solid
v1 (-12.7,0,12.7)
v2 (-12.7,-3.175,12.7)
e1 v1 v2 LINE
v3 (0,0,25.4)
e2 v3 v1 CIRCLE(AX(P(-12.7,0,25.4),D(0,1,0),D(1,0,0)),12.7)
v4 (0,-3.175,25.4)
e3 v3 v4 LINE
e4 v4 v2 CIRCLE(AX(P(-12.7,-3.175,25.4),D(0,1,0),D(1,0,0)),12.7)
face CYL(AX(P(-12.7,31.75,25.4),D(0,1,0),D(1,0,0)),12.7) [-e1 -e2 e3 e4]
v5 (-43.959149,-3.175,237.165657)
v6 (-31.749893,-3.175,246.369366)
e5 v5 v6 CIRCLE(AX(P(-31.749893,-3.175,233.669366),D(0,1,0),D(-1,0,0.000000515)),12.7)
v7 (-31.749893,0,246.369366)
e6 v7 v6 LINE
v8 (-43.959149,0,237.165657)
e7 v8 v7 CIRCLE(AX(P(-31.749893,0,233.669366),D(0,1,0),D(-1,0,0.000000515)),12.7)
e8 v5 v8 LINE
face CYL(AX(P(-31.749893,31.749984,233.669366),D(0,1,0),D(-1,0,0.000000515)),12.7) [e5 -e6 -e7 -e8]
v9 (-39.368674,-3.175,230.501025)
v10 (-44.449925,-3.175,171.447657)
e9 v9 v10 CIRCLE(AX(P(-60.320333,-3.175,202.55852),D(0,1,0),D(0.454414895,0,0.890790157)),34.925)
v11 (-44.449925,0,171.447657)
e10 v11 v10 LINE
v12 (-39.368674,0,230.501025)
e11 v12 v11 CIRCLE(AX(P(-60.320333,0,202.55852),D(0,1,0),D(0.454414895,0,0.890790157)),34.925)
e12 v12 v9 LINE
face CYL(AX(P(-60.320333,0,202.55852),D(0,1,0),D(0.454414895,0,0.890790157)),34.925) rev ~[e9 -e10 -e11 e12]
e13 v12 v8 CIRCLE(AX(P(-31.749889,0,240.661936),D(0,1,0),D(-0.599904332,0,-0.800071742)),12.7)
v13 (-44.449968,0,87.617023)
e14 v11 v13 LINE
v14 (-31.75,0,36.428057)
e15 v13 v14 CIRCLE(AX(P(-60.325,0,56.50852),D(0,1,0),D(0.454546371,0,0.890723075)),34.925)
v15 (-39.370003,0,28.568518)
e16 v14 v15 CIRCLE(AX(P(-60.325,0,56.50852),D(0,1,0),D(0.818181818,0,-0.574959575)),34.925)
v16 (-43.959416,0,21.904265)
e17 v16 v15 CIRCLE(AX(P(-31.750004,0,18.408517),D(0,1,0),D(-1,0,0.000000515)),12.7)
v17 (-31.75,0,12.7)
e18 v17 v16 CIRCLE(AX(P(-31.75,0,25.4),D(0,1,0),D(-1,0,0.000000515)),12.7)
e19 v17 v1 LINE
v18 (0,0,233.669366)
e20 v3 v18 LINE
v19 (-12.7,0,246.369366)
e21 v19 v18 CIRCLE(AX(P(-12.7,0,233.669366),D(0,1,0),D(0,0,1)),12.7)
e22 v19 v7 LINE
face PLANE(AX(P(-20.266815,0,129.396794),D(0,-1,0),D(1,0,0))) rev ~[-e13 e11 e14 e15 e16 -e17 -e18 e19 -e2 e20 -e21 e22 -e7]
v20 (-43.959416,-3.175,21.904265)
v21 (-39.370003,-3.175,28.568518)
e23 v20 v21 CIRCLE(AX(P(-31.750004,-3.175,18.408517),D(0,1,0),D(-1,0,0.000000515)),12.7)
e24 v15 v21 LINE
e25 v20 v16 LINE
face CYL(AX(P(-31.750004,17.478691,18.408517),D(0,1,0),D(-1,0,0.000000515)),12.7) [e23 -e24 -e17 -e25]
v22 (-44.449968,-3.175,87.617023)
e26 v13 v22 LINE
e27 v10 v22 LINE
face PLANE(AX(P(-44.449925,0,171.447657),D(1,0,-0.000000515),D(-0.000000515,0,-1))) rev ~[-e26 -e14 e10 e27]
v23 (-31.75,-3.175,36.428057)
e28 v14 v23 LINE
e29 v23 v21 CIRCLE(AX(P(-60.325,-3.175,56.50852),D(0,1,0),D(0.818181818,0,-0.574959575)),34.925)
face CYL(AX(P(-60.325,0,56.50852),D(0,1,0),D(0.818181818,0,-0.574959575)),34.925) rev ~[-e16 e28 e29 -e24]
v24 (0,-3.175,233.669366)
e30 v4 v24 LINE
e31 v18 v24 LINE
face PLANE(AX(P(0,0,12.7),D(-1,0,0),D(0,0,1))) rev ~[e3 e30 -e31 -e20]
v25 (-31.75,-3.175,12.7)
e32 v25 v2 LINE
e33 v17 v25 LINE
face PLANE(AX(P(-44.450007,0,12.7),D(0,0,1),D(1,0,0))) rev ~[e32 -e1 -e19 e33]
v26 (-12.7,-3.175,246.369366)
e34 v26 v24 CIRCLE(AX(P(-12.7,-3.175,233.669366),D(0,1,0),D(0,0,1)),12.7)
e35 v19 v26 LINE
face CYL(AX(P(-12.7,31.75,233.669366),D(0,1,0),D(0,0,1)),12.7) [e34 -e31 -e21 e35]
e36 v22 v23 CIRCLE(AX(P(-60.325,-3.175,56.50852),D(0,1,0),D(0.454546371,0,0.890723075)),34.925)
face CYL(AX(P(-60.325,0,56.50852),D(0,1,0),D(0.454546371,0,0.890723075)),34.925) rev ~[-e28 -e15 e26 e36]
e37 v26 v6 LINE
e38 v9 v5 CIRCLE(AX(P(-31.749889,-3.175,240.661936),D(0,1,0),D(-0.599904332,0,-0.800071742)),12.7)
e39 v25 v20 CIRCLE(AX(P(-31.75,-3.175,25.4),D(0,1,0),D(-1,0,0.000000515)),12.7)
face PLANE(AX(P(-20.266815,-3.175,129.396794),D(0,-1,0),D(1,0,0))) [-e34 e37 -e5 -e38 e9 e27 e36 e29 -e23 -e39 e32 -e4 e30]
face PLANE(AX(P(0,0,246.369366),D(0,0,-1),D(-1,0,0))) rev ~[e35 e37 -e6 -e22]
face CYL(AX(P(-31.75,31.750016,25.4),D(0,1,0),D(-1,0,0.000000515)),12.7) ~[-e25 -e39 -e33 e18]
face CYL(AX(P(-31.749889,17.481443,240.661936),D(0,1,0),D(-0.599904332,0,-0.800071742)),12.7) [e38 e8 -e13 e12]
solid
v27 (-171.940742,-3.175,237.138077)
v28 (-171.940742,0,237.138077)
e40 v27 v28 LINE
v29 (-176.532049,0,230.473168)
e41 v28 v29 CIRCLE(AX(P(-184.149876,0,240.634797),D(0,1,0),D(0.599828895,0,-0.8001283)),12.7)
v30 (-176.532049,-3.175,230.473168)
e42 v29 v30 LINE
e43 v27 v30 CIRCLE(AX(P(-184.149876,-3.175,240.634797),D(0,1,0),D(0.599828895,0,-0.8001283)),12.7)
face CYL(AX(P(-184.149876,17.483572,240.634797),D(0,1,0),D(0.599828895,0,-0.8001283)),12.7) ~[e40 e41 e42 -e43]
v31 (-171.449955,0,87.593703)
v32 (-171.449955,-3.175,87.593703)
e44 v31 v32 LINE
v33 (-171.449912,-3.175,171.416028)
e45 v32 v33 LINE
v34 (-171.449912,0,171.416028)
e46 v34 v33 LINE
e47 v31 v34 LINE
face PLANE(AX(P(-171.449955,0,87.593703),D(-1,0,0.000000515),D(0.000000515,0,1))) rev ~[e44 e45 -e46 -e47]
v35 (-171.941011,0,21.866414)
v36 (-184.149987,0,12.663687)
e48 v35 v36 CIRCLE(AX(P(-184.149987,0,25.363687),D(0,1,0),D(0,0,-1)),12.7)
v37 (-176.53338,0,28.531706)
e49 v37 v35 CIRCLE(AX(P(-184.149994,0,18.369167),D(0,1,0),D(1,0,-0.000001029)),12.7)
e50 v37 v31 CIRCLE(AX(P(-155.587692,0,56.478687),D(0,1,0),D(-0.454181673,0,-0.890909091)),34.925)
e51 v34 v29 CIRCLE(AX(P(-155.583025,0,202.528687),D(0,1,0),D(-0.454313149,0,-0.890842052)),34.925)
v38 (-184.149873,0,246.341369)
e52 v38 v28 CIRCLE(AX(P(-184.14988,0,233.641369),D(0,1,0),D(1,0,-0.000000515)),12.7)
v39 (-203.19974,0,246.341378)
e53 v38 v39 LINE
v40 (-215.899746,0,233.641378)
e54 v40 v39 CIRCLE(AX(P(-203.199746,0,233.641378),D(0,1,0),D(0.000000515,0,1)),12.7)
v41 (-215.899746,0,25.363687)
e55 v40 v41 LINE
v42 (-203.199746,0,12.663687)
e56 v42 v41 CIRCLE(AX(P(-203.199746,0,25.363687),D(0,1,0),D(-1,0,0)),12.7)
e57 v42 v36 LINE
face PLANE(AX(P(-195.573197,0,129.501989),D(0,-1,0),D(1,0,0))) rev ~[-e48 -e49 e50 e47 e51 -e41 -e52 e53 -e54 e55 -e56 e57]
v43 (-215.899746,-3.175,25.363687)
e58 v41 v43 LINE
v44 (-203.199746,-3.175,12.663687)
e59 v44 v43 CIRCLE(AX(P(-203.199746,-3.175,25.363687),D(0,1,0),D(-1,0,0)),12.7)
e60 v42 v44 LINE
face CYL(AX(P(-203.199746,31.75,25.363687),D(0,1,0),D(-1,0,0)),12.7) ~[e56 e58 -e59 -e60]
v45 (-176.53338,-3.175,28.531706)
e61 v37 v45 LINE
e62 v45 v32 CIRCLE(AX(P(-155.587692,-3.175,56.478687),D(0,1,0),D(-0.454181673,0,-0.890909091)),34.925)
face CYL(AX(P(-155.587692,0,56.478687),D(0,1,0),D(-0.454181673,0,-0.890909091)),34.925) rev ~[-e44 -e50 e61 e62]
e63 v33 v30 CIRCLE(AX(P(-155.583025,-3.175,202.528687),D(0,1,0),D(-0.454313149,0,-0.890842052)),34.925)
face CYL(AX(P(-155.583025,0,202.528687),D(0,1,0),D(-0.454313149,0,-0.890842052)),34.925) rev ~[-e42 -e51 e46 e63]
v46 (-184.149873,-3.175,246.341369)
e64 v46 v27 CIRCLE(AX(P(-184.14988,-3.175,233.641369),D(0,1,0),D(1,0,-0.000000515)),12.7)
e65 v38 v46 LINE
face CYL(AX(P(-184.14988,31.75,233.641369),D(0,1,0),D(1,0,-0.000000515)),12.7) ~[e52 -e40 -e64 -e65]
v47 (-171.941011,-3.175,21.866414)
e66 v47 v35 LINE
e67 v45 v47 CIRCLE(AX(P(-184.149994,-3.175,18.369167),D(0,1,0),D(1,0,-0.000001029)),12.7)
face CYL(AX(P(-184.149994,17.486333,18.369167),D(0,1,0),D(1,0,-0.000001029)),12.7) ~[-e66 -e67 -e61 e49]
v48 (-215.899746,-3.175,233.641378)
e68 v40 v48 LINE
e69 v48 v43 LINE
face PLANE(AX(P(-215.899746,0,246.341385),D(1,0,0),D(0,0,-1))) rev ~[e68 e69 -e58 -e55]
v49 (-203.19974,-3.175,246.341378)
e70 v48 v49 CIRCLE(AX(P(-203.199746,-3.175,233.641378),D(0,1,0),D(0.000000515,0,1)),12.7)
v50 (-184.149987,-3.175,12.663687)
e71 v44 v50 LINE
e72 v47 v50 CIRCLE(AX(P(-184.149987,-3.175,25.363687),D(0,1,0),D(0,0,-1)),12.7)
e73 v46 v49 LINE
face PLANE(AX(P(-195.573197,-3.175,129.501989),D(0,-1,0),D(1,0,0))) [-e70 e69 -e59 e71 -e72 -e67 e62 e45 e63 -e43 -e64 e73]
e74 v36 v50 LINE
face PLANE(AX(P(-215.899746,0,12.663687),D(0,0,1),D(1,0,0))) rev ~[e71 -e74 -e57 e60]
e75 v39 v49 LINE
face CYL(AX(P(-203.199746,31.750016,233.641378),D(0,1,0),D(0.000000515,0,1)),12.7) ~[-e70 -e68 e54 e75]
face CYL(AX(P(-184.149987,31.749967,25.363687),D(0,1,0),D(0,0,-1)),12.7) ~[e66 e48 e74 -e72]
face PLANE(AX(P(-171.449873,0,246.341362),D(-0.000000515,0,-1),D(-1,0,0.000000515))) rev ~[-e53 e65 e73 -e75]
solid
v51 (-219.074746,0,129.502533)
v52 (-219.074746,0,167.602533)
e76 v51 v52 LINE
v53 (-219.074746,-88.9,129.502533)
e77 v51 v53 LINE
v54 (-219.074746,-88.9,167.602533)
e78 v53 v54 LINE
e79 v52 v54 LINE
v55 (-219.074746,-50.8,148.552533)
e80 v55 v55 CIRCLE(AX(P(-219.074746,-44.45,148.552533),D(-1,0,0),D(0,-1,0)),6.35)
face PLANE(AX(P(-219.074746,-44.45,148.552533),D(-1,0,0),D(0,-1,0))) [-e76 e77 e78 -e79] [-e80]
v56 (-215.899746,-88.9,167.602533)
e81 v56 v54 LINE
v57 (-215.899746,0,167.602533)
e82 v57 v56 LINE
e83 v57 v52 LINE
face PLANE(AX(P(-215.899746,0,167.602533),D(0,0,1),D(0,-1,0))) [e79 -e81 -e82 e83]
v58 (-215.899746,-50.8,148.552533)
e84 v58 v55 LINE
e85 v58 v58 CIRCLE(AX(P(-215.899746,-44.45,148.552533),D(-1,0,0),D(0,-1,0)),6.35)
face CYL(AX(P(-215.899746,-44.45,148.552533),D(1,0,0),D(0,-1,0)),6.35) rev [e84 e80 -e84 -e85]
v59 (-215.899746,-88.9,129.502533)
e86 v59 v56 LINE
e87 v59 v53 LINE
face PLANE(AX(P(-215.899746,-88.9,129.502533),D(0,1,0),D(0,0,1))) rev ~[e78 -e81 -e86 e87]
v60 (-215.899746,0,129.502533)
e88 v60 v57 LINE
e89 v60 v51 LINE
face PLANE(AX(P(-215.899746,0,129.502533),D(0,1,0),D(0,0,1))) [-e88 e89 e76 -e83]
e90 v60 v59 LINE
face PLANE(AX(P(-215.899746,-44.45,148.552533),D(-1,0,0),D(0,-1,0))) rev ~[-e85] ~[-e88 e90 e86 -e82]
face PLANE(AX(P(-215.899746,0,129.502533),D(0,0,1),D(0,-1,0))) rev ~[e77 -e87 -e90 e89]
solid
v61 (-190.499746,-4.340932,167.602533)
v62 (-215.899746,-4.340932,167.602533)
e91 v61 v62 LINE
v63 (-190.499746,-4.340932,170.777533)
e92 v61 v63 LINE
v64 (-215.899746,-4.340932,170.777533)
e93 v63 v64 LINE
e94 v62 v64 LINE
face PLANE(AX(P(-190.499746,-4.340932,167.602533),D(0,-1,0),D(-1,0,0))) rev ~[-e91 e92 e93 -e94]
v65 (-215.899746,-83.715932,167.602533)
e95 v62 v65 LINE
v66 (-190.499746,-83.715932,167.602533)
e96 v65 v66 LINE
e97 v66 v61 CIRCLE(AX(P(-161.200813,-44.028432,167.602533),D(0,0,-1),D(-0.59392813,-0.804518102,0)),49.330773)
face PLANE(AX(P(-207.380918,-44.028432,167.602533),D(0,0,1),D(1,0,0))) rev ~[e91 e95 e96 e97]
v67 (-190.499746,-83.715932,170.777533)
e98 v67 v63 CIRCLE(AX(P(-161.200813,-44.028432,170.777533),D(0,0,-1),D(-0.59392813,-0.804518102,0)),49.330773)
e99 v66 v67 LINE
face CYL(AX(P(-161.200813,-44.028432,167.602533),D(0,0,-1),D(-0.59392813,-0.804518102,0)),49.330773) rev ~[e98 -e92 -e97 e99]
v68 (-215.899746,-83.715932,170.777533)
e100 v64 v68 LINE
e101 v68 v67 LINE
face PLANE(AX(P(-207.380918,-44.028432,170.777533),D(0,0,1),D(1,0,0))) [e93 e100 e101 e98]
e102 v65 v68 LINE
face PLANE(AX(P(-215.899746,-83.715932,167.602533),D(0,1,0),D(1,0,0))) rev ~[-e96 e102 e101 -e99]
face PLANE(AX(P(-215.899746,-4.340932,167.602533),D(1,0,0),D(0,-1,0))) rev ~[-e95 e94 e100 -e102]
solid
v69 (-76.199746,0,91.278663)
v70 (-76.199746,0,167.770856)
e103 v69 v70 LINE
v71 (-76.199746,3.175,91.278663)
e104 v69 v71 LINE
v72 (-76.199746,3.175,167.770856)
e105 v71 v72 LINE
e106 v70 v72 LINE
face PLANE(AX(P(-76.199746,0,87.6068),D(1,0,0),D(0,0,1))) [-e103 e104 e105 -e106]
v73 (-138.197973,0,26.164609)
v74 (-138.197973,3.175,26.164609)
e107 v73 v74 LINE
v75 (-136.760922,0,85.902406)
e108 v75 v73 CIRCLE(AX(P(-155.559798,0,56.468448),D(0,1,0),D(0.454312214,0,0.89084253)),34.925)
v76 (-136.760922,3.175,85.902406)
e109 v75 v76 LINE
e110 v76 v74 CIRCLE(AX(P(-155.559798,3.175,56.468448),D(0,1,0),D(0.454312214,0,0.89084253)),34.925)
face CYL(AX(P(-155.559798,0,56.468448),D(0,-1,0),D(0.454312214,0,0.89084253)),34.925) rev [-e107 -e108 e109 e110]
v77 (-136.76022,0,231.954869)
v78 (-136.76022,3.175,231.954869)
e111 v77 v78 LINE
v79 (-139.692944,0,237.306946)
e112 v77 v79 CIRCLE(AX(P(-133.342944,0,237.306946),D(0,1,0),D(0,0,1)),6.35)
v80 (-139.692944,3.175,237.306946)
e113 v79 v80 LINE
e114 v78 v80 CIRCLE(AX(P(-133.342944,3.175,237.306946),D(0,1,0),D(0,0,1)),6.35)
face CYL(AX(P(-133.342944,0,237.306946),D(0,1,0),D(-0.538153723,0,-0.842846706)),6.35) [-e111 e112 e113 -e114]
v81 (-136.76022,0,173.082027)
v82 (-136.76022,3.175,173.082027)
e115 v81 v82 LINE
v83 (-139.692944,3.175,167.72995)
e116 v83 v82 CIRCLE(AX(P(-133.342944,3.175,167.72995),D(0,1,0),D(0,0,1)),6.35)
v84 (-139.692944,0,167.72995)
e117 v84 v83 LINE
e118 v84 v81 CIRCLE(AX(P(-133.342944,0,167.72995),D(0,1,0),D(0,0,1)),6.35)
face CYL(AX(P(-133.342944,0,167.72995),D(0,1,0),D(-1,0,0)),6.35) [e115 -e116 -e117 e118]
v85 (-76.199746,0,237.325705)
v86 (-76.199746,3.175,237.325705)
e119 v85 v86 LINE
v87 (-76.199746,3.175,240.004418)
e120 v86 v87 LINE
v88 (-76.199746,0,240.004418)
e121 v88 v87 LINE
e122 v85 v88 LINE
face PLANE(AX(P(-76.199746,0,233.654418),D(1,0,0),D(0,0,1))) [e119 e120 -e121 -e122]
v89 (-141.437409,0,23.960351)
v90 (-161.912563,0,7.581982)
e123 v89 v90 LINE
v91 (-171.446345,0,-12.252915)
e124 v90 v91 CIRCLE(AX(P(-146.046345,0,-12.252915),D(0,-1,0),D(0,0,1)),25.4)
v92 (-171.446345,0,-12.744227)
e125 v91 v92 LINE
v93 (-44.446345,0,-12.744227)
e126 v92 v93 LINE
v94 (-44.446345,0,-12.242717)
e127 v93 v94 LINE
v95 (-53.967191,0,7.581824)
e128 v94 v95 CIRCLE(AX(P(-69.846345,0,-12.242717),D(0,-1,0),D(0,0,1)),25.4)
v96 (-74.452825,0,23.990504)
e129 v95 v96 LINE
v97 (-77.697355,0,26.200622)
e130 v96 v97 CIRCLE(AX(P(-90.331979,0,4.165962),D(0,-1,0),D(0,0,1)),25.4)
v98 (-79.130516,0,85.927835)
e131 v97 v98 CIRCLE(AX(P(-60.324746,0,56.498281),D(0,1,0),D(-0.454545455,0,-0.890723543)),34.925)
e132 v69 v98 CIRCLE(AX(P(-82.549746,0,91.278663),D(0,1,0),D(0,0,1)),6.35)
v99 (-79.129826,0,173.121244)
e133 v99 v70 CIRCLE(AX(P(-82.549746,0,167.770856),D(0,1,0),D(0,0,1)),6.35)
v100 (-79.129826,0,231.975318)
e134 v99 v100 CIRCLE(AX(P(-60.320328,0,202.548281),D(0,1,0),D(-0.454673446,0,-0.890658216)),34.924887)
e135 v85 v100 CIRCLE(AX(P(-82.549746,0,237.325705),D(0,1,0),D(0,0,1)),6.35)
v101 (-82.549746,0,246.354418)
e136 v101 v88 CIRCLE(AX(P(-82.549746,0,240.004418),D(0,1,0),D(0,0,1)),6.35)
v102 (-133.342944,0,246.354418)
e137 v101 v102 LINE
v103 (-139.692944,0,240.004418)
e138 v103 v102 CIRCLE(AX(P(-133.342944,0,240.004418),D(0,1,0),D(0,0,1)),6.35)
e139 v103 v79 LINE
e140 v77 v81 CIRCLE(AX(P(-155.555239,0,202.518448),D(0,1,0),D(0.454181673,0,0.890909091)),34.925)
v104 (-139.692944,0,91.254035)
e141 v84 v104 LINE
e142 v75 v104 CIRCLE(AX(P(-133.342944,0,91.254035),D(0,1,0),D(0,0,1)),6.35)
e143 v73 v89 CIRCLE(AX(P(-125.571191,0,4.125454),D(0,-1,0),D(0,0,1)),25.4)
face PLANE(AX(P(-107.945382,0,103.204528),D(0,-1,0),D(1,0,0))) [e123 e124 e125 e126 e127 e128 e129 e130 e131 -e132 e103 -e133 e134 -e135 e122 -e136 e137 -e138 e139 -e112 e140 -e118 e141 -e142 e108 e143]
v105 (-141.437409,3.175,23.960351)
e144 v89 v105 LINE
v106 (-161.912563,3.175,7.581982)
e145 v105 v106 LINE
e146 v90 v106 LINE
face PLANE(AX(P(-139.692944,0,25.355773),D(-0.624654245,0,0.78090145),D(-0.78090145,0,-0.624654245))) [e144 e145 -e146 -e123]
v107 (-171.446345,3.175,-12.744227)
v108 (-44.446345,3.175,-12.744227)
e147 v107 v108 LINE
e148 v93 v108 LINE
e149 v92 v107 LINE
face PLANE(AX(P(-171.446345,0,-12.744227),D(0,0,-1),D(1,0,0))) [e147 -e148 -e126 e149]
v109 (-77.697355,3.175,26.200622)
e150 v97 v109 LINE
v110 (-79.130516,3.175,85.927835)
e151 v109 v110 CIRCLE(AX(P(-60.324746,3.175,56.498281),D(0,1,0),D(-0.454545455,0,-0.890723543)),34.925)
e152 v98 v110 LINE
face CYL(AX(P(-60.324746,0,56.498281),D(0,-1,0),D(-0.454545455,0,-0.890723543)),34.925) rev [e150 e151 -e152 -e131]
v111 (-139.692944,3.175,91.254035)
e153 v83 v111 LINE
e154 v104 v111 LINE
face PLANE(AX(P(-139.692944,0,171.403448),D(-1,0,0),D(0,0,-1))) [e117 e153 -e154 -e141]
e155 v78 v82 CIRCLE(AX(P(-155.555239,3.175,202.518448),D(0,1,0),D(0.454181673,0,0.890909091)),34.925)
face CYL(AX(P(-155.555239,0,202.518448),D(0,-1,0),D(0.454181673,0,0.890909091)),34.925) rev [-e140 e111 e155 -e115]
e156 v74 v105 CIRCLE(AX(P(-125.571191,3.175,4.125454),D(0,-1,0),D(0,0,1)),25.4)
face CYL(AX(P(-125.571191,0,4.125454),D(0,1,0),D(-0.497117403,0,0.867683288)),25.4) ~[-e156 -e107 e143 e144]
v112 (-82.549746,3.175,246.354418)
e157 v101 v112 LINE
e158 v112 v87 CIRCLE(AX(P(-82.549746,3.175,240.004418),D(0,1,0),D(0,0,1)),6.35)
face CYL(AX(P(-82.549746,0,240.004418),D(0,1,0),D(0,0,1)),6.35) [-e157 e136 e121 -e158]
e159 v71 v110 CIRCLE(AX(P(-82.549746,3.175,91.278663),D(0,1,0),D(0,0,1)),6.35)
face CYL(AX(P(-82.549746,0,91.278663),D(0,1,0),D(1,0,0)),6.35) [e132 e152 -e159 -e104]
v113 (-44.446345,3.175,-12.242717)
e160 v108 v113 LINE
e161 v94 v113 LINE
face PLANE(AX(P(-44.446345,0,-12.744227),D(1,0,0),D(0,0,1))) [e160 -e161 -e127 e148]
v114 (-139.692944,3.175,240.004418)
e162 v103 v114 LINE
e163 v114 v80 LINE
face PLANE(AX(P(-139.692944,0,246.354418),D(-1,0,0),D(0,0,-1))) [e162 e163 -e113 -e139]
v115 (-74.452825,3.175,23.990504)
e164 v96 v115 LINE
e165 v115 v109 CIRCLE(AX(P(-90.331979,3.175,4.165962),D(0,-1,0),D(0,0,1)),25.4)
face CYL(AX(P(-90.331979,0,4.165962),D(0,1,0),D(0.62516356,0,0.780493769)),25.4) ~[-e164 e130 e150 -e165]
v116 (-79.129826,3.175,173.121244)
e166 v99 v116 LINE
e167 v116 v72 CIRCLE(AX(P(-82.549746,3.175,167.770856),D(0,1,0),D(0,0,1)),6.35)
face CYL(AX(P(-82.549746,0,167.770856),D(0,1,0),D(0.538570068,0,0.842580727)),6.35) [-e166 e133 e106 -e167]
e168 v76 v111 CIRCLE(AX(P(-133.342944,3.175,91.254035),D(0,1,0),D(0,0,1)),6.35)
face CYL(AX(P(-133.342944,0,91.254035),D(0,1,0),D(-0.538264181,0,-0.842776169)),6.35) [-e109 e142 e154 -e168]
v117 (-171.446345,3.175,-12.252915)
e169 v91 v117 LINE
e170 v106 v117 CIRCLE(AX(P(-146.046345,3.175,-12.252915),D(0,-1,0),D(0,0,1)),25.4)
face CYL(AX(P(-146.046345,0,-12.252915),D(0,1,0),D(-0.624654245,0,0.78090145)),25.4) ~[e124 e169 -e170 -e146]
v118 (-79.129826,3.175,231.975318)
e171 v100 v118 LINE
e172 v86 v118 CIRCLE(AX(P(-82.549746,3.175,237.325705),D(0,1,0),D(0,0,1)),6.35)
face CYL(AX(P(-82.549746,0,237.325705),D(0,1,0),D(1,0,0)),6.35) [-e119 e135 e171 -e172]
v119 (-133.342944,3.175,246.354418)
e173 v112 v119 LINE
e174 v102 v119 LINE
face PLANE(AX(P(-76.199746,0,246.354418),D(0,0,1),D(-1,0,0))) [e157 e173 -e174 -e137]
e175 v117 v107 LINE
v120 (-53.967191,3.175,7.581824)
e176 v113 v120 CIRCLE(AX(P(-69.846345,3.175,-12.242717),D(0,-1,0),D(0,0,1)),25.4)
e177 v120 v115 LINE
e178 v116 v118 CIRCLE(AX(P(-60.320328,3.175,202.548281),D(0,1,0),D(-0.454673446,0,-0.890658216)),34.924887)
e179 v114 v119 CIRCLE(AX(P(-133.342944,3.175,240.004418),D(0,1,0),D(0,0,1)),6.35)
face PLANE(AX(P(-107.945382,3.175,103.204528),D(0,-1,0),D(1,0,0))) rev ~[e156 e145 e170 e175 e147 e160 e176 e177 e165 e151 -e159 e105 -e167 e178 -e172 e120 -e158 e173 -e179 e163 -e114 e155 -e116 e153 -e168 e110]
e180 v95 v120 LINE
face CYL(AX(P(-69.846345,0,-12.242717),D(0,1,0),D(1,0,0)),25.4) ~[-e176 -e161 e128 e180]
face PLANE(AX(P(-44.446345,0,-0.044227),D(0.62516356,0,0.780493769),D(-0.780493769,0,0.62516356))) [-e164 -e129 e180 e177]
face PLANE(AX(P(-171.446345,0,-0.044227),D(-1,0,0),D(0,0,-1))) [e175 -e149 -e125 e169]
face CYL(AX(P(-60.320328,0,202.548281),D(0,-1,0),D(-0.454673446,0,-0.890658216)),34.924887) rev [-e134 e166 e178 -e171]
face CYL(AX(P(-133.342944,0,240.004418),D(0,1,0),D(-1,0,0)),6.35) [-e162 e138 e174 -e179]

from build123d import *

# Parameters (mm, degrees)
F1_DEPTH      = 3.175
F2_T1_DEPTH   = 66.674967319
F2_T3_DEPTH   = 66.6750326811
F2_T5_DEPTH   = 38.1323821457
F2_T7_DEPTH   = 38.1378851793
F2_T9_DEPTH   = 66.675
F2_2_T1_DEPTH = 66.6749346379
F2_2_T3_DEPTH = 38.1476659019
F2_2_T5_DEPTH = 38.1421437691
F2_2_T7_DEPTH = 66.675
F2_2_T9_DEPTH = 66.6750326811
F4_DEPTH      = 3.175
F5_R          = 25.4
F6_R          = 6.35
F7_W          = 88.9
F7_H          = 38.1
F7_R          = 6.35
F8_DEPTH      = 3.175
F10_DEPTH     = 3.175


# Not quite as in the source:
# - a fillet or chamfer that OpenCascade refuses, or shapes differently, is made with other operations: its cross-section is extruded or revolved along the edge and cut away or added
# - ends of sketch curves that miss each other by under 0.0002 mm in the source are joined


with BuildPart() as f1:
    # F0 (on Front) → F1 (new body)
    with BuildSketch(Plane.XZ):
        with BuildLine():
            Line((-44.45, 25.4), (-44.4500065362, 12.7))
            Line((-44.4500065362, 12.7), (0, 12.7))
            Line((0, 12.7), (0, 246.3693658836))
            Line((0, 246.3693658836), (-44.4498862754, 246.3693658836))
            Line((-44.4498862754, 246.3693658836), (-44.4498928116, 233.6693658836))
            ThreePointArc((-44.4498928116, 233.6693658836), (-25.3953330127, 202.5585016842), (-44.4499248348, 171.4476570981))
            Line((-44.4499248348, 171.4476570981), (-44.4499679793, 87.6170231262))
            ThreePointArc((-44.4499679793, 87.6170231262), (-26.4276710435, 64.9184373675), (-31.7499999998, 36.4280565915))
            ThreePointArc((-31.7499999998, 36.4280565915), (-37.4261979997, 30.1380724116), (-44.45, 25.4))
        make_face()
    extrude(amount=F1_DEPTH)

    # F2: fillet of radius 12.7 on 6 edges, made by hand

    # F2_s2 → F2_t1 (cut)
    with BuildSketch(Plane.XZ.offset(-31.7499836595)):
        with BuildLine():
            ThreePointArc((-44.4498928116, 233.6693724198), (-40.7301466218, 242.6496243156), (-31.7498928116, 246.3693658836))
            Line((-31.7498928116, 246.3693658836), (-44.4498862754, 246.3693658836))
            Line((-44.4498862754, 246.3693658836), (-44.4498928116, 233.6693724198))
        make_face()
    extrude(amount=F2_T1_DEPTH, mode=Mode.SUBTRACT)

    # F2_s4 → F2_t3 (cut)
    with BuildSketch(Plane.XZ.offset(-31.7500163405)):
        with BuildLine():
            ThreePointArc((-44.45, 25.4000065362), (-40.730258432, 16.4197461898), (-31.75, 12.7))
            Line((-31.75, 12.7), (-44.4500065362, 12.7))
            Line((-44.4500065362, 12.7), (-44.45, 25.4000065362))
        make_face()
    extrude(amount=F2_T3_DEPTH, mode=Mode.SUBTRACT)

    # F2_s6 → F2_t5 (cut)
    with BuildSketch(Plane.XZ.offset(-17.4786910728)):
        with BuildLine():
            ThreePointArc((-44.4500035982, 18.4085235709), (-43.1092271942, 24.088133157), (-39.3700026387, 28.5685177543))
            ThreePointArc((-39.3700026387, 28.5685177543), (-41.8419793432, 26.8752011139), (-44.45, 25.4))
            Line((-44.45, 25.4), (-44.4500035982, 18.4085235709))
        make_face()
    extrude(amount=F2_T5_DEPTH, mode=Mode.SUBTRACT)

    # F2_s8 → F2_t7 (cut)
    with BuildSketch(Plane.XZ.offset(-17.4814425896)):
        with BuildLine():
            ThreePointArc((-39.3686742261, 230.5010252567), (-43.1087763961, 234.9816474858), (-44.4498892128, 240.6619429195))
            Line((-44.4498892128, 240.6619429195), (-44.4498928116, 233.6693658836))
            ThreePointArc((-44.4498928116, 233.6693658836), (-41.8412545983, 232.1942967863), (-39.3686742261, 230.5010252567))
        make_face()
    extrude(amount=F2_T7_DEPTH, mode=Mode.SUBTRACT)

    # F2_s10 → F2_t9 (cut)
    with BuildSketch(Plane.XZ.offset(-31.75)):
        with BuildLine():
            ThreePointArc((-12.7, 246.3693658836), (-3.7197438789, 242.6496220047), (0, 233.6693658836))
            Line((0, 233.6693658836), (0, 246.3693658836))
            Line((0, 246.3693658836), (-12.7, 246.3693658836))
        make_face()
        with BuildLine():
            ThreePointArc((0, 25.4), (-3.7197438789, 16.4197438789), (-12.7, 12.7))
            Line((-12.7, 12.7), (0, 12.7))
            Line((0, 12.7), (0, 25.4))
        make_face()
    extrude(amount=F2_T9_DEPTH, mode=Mode.SUBTRACT)


with BuildPart() as f1b:
    # F0 (on Front) → F1, piece 2 (new body)
    with BuildSketch(Plane.XZ):
        with BuildLine():
            Line((-171.4499549, 87.5937033957), (-171.4499117598, 171.4160283107))
            ThreePointArc((-171.4499117598, 171.4160283107), (-190.5080250242, 202.5287049682), (-171.4498797348, 233.6413620087))
            Line((-171.4498797348, 233.6413620087), (-171.4498731986, 246.3413620087))
            Line((-171.4498731986, 246.3413620087), (-215.8997464016, 246.3413848854))
            Line((-215.8997464016, 246.3413848854), (-215.8997464016, 12.6636870682))
            Line((-215.8997464016, 12.6636870682), (-171.4499999998, 12.6636870682))
            Line((-171.4499999998, 12.6636870682), (-171.4499869274, 25.3636870682))
            ThreePointArc((-171.4499869274, 25.3636870682), (-190.5126920115, 56.4787050428), (-171.4499549, 87.5937033957))
        make_face()
    extrude(amount=F1_DEPTH)

    # F2#2: fillet of radius 12.7 on 6 edges, made by hand

    # F2_2_s2 → F2_2_t1 (cut)
    with BuildSketch(Plane.XZ.offset(-31.749967319)):
        with BuildLine():
            ThreePointArc((-184.1499869274, 12.6636870682), (-175.1697354281, 16.3834263254), (-171.4499869274, 25.3636739958))
            Line((-171.4499869274, 25.3636739958), (-171.4499999998, 12.6636870682))
            Line((-171.4499999998, 12.6636870682), (-184.1499869274, 12.6636870682))
        make_face()
    extrude(amount=F2_2_T1_DEPTH, mode=Mode.SUBTRACT)

    # F2_2_s4 → F2_2_t3 (cut)
    with BuildSketch(Plane.XZ.offset(-17.486332951)):
        with BuildLine():
            ThreePointArc((-171.4499941271, 18.3691538878), (-172.7917123612, 24.050666351), (-176.5333802296, 28.5317056557))
            ThreePointArc((-176.5333802296, 28.5317056557), (-174.0597246836, 26.8385178049), (-171.4499869274, 25.3636870682))
            Line((-171.4499869274, 25.3636870682), (-171.4499941271, 18.3691538878))
        make_face()
    extrude(amount=F2_2_T3_DEPTH, mode=Mode.SUBTRACT)

    # F2_2_s6 → F2_2_t5 (cut)
    with BuildSketch(Plane.XZ.offset(-17.4835718845)):
        with BuildLine():
            ThreePointArc((-176.5320491725, 230.4731678841), (-172.7912596702, 234.9539670783), (-171.4498761355, 240.6347907625))
            Line((-171.4498761355, 240.6347907625), (-171.4498797348, 233.6413620087))
            ThreePointArc((-171.4498797348, 233.6413620087), (-174.058998545, 232.1663999192), (-176.5320491725, 230.4731678841))
        make_face()
    extrude(amount=F2_2_T5_DEPTH, mode=Mode.SUBTRACT)

    # F2_2_s8 → F2_2_t7 (cut)
    with BuildSketch(Plane.XZ.offset(-31.75)):
        with BuildLine():
            ThreePointArc((-171.4498797348, 233.6413620087), (-175.1696189919, 242.6216200442), (-184.1498731986, 246.3413685449))
            Line((-184.1498731986, 246.3413685449), (-171.4498731986, 246.3413620087))
            Line((-171.4498731986, 246.3413620087), (-171.4498797348, 233.6413620087))
        make_face()
        with BuildLine():
            ThreePointArc((-215.8997464016, 25.3636870682), (-212.1800025226, 16.3834309472), (-203.1997464016, 12.6636870682))
            Line((-203.1997464016, 12.6636870682), (-215.8997464016, 12.6636870682))
            Line((-215.8997464016, 12.6636870682), (-215.8997464016, 25.3636870682))
        make_face()
    extrude(amount=F2_2_T7_DEPTH, mode=Mode.SUBTRACT)

    # F2_2_s10 → F2_2_t9 (cut)
    with BuildSketch(Plane.XZ.offset(-31.7500163405)):
        with BuildLine():
            ThreePointArc((-203.1997398653, 246.3413783492), (-212.1800002117, 242.6216367812), (-215.8997464016, 233.6413783492))
            Line((-215.8997464016, 233.6413783492), (-215.8997464016, 246.3413848854))
            Line((-215.8997464016, 246.3413848854), (-203.1997398653, 246.3413783492))
        make_face()
    extrude(amount=F2_2_T9_DEPTH, mode=Mode.SUBTRACT)


with BuildPart() as f4:
    # F3 (on Front) → F4 (new body)
    with BuildSketch(Plane.XZ):
        with BuildLine():
            Line((-139.692944115, 171.4034480763), (-139.6929441151, 87.5811234915))
            ThreePointArc((-139.6929441151, 87.5811234915), (-120.6347981808, 56.4684481475), (-139.6929441152, 25.3557728035))
            Line((-139.6929441152, 25.3557728035), (-171.4463452584, -0.0442271965))
            Line((-171.4463452584, -0.0442271965), (-171.4463452584, -12.7442271965))
            Line((-171.4463452584, -12.7442271965), (-107.9463452584, -12.7442271965))
            Line((-107.9463452584, -12.7442271965), (-44.4463452584, -12.7442271965))
            Line((-44.4463452584, -12.7442271965), (-44.4463452584, -0.0442271965))
            Line((-44.4463452584, -0.0442271965), (-76.1997464016, 25.3897610103))
            ThreePointArc((-76.1997464016, 25.3897610103), (-95.2497464016, 56.4982807437), (-76.1997464016, 87.606800477))
            Line((-76.1997464016, 87.606800477), (-76.1997464016, 171.442142989))
            ThreePointArc((-76.1997464016, 171.442142989), (-95.2452147999, 202.548280738), (-76.1997464016, 233.6544184871))
            Line((-76.1997464016, 233.6544184871), (-76.1997464016, 246.3544184871))
            Line((-76.1997464016, 246.3544184871), (-139.692944115, 246.3544184871))
            Line((-139.692944115, 246.3544184871), (-139.692944115, 233.6334480764))
            ThreePointArc((-139.692944115, 233.6334480764), (-120.6302390309, 202.5184480763), (-139.692944115, 171.4034480763))
        make_face()
    extrude(amount=-F4_DEPTH)

    # F5
    f5_edges = [f4.edges().sort_by_distance(p)[0] for p in [
        (-171.446345, 1.5875, -0.044227),
        (-139.692944, 1.5875, 25.355773),
        (-76.199746, 1.5875, 25.389761),
        (-44.446345, 1.5875, -0.044227),
    ]]
    fillet(f5_edges, radius=F5_R)

    # F6
    f6_edges = [f4.edges().sort_by_distance(p)[0] for p in [
        (-139.692944, 1.5875, 246.354418),
        (-76.199746, 1.5875, 246.354418),
        (-76.199746, 1.5875, 233.654418),
        (-139.692944, 1.5875, 233.633448),
        (-139.692944, 1.5875, 171.403448),
        (-76.199746, 1.5875, 171.442143),
        (-76.199746, 1.5875, 87.6068),
        (-139.692944, 1.5875, 87.581123),
    ]]
    fillet(f6_edges, radius=F6_R)


with BuildPart() as f8:
    # F7 (on face) → F8 (new body)
    with BuildSketch(Plane(origin=(-215.8997464016, 0, 0), x_dir=(0, -1, 0), z_dir=(-1, 0, 0))):
        with Locations((44.45, 148.5525327087)):
            Rectangle(F7_W, F7_H)
        with Locations((44.45, 148.5525327087)):
            Circle(F7_R, mode=Mode.SUBTRACT)
    extrude(amount=F8_DEPTH)


with BuildPart() as f10:
    # F9 (on face) → F10 (new body)
    with BuildSketch(Plane.XY.offset(167.6025327087)):
        with BuildLine():
            Line((-190.4997464016, -4.3409317732), (-215.8997464016, -4.3409317732))
            Line((-215.8997464016, -4.3409317732), (-215.8997464016, -83.7159317732))
            Line((-215.8997464016, -83.7159317732), (-190.4997464016, -83.7159317732))
            ThreePointArc((-190.4997464016, -83.7159317732), (-210.5315857086, -44.0284317732), (-190.4997464016, -4.3409317732))
        make_face()
    extrude(amount=F10_DEPTH)


solid = Compound([f1.part, f1b.part, f4.part, f8.part, f10.part])
